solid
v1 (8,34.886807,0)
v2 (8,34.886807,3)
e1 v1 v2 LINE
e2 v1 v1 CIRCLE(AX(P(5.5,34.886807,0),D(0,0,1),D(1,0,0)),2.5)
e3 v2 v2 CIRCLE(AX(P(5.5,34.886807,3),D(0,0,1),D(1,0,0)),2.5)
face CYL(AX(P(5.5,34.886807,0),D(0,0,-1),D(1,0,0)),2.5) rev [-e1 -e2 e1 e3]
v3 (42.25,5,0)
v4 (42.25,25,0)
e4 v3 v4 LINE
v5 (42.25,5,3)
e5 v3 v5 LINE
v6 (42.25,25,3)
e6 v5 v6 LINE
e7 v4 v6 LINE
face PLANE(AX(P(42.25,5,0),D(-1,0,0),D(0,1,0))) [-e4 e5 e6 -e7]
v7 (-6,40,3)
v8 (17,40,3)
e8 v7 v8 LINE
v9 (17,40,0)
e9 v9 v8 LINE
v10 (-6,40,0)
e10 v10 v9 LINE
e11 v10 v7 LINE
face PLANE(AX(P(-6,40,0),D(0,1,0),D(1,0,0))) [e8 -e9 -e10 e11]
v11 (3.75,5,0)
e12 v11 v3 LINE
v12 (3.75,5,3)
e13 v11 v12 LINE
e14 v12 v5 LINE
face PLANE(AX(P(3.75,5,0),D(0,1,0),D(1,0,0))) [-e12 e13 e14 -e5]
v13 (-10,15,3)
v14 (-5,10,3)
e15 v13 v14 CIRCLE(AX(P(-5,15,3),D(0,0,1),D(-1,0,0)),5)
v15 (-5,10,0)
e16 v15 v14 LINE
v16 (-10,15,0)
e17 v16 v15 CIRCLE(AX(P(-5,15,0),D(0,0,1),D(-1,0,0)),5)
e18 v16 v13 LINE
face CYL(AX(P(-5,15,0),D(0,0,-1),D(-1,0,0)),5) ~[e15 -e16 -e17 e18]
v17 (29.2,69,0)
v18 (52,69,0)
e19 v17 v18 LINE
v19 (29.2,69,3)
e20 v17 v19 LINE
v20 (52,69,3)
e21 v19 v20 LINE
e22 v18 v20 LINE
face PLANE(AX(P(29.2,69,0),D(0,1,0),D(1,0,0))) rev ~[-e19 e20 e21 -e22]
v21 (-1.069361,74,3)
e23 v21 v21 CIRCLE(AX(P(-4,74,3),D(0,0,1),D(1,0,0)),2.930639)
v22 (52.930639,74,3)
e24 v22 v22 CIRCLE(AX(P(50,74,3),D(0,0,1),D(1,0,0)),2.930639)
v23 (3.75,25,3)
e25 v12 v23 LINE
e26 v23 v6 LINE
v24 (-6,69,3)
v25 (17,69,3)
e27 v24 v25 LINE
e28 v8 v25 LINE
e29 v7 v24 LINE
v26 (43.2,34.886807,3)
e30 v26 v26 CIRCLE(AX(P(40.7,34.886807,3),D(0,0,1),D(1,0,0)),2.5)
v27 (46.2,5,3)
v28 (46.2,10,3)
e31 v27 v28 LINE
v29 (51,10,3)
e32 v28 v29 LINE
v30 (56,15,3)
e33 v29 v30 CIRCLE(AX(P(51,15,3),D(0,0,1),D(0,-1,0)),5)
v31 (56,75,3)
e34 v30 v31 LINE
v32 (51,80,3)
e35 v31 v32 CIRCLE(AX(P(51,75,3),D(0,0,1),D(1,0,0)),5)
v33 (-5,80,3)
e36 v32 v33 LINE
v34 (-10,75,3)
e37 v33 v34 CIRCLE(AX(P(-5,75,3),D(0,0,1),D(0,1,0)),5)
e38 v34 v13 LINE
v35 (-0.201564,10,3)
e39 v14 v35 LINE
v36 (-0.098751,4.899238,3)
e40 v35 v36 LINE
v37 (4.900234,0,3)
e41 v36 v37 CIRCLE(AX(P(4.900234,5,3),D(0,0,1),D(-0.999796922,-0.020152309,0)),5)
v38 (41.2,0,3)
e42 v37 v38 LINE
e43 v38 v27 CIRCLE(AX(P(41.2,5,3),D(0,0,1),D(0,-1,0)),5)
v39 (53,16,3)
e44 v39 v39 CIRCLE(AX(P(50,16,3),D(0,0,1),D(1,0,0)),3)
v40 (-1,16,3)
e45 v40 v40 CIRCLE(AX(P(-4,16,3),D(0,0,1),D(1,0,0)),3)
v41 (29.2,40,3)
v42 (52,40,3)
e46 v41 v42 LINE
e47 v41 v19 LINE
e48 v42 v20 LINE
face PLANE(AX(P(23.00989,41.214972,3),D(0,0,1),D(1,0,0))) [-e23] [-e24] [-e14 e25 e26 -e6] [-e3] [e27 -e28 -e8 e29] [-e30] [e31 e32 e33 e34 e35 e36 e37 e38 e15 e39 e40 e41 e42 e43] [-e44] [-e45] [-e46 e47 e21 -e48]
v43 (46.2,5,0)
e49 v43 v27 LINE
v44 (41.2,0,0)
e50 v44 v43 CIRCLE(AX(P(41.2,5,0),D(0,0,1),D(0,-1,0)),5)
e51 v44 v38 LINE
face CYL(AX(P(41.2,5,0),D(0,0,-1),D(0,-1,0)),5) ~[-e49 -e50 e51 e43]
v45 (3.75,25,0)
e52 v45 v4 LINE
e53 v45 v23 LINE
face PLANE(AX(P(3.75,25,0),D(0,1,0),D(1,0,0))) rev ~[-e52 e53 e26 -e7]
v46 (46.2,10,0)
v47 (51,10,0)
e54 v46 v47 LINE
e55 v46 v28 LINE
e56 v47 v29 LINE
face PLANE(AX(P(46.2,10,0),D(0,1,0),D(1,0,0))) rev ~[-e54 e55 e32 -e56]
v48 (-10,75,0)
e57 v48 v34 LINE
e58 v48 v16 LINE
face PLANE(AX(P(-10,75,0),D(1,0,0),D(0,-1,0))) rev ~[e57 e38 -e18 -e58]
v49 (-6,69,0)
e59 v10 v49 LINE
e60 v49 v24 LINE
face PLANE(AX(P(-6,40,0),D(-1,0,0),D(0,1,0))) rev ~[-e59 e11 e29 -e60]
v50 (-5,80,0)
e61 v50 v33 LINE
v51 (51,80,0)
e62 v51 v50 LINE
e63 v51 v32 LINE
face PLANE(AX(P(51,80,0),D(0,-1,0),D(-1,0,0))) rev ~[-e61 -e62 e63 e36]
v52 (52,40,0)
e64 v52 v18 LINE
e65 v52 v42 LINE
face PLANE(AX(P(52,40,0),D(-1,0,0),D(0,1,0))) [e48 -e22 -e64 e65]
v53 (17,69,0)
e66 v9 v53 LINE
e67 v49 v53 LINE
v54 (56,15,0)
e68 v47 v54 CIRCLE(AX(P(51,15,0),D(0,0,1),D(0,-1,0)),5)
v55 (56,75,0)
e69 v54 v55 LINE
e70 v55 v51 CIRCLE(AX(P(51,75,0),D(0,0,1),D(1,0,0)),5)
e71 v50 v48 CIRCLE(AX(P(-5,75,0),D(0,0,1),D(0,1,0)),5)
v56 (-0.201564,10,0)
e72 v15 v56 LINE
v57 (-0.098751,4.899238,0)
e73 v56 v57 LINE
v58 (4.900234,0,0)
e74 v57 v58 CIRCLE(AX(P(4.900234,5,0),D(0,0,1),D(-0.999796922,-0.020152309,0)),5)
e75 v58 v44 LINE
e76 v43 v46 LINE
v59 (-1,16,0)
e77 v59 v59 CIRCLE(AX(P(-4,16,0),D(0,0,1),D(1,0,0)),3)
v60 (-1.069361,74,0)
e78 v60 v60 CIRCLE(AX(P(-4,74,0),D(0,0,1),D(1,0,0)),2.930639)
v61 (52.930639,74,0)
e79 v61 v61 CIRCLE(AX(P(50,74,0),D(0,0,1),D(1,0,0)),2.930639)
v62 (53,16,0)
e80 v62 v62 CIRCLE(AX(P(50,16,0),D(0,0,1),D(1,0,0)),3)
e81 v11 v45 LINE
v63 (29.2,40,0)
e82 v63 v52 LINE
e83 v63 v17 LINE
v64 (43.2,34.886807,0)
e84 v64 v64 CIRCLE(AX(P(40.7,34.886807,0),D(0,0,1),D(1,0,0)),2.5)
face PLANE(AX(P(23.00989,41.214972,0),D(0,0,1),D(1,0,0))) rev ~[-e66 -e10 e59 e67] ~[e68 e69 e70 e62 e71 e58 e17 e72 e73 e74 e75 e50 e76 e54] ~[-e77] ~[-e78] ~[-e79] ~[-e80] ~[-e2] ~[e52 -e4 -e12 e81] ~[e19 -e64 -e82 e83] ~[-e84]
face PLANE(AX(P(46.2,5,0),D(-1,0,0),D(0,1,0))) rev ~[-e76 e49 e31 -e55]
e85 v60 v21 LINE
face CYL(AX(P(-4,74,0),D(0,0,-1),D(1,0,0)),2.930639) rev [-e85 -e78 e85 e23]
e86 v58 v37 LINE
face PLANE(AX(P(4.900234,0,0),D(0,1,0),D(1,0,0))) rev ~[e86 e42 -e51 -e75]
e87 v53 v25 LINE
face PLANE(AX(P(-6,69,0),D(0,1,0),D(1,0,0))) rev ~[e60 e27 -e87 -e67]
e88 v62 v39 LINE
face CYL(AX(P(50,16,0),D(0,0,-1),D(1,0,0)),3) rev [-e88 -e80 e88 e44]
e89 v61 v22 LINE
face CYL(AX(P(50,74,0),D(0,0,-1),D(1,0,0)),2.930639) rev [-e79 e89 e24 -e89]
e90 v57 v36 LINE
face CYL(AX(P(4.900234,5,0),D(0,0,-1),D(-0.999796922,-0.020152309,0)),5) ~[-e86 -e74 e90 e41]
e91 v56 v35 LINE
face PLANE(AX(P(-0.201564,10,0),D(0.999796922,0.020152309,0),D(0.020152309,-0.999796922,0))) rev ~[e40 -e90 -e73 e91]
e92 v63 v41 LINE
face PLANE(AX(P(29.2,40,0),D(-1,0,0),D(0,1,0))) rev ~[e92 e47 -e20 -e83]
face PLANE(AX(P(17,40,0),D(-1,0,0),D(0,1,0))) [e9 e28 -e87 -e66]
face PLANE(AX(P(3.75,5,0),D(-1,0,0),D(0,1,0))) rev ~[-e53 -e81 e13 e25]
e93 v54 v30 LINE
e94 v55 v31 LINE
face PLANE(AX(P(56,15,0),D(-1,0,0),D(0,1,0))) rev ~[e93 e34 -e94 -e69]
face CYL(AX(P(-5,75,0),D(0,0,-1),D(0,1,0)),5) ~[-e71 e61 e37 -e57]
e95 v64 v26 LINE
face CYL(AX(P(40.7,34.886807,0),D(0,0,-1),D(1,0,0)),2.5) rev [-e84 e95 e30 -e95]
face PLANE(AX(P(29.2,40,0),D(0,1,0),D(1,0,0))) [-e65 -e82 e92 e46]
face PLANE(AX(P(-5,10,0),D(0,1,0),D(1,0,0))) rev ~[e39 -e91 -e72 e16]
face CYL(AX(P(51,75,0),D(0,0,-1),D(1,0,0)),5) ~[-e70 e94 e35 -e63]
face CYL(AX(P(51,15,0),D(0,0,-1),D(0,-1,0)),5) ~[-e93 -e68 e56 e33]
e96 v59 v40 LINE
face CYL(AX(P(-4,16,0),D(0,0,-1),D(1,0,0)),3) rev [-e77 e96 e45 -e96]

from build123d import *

# Parameters (mm, degrees)
F0_R     = 3
F0_R_2   = 2.5
F0_W     = 38.5
F0_H     = 20
F0_W_2   = 23
F0_H_2   = 29
F0_R_3   = 2.9306388833
F0_W_3   = 22.8
F1_DEPTH = 3


# Not quite as in the source:
# - a feature names something its author has since deleted; it is built from what else it names


with BuildPart() as f1:
    # F0 (on Top) → F1 (new body)
    with BuildSketch(Plane.XY):
        with BuildLine():
            ThreePointArc((-0.0987510204, 4.899238456), (1.4005055782, 1.429019202), (4.9002335876, 0))
            Line((4.9002335876, 0), (41.2, 0))
            ThreePointArc((41.2, 0), (44.7355339059, 1.4644660941), (46.2, 5))
            Line((46.2, 5), (46.2, 10))
            Line((46.2, 10), (51, 10))
            ThreePointArc((51, 10), (54.5355339059, 11.4644660941), (56, 15))
            Line((56, 15), (56, 30))
            Line((56, 30), (56, 75))
            ThreePointArc((56, 75), (54.5355339059, 78.5355339059), (51, 80))
            Line((51, 80), (-5, 80))
            ThreePointArc((-5, 80), (-8.5355339059, 78.5355339059), (-10, 75))
            Line((-10, 75), (-10, 30))
            Line((-10, 30), (-10, 15))
            ThreePointArc((-10, 15), (-8.5355339059, 11.4644660941), (-5, 10))
            Line((-5, 10), (-0.2015640213, 10))
            Line((-0.2015640213, 10), (-0.0987510204, 4.899238456))
        make_face()
        with Locations((-4, 16)):
            Circle(F0_R, mode=Mode.SUBTRACT)
        with Locations((5.5, 34.8868072033)):
            Circle(F0_R_2, mode=Mode.SUBTRACT)
        with Locations((23, 15)):
            Rectangle(F0_W, F0_H, mode=Mode.SUBTRACT)
        with Locations((50, 16)):
            Circle(F0_R, mode=Mode.SUBTRACT)
        with Locations((40.7, 34.8868072033)):
            Circle(F0_R_2, mode=Mode.SUBTRACT)
        with Locations((5.5, 54.5)):
            Rectangle(F0_W_2, F0_H_2, mode=Mode.SUBTRACT)
        with Locations((-4, 74)):
            Circle(F0_R_3, mode=Mode.SUBTRACT)
        with Locations((40.6, 54.5)):
            Rectangle(F0_W_3, F0_H_2, mode=Mode.SUBTRACT)
        with Locations((50, 74)):
            Circle(F0_R_3, mode=Mode.SUBTRACT)
    extrude(amount=F1_DEPTH)


solid = f1.part
